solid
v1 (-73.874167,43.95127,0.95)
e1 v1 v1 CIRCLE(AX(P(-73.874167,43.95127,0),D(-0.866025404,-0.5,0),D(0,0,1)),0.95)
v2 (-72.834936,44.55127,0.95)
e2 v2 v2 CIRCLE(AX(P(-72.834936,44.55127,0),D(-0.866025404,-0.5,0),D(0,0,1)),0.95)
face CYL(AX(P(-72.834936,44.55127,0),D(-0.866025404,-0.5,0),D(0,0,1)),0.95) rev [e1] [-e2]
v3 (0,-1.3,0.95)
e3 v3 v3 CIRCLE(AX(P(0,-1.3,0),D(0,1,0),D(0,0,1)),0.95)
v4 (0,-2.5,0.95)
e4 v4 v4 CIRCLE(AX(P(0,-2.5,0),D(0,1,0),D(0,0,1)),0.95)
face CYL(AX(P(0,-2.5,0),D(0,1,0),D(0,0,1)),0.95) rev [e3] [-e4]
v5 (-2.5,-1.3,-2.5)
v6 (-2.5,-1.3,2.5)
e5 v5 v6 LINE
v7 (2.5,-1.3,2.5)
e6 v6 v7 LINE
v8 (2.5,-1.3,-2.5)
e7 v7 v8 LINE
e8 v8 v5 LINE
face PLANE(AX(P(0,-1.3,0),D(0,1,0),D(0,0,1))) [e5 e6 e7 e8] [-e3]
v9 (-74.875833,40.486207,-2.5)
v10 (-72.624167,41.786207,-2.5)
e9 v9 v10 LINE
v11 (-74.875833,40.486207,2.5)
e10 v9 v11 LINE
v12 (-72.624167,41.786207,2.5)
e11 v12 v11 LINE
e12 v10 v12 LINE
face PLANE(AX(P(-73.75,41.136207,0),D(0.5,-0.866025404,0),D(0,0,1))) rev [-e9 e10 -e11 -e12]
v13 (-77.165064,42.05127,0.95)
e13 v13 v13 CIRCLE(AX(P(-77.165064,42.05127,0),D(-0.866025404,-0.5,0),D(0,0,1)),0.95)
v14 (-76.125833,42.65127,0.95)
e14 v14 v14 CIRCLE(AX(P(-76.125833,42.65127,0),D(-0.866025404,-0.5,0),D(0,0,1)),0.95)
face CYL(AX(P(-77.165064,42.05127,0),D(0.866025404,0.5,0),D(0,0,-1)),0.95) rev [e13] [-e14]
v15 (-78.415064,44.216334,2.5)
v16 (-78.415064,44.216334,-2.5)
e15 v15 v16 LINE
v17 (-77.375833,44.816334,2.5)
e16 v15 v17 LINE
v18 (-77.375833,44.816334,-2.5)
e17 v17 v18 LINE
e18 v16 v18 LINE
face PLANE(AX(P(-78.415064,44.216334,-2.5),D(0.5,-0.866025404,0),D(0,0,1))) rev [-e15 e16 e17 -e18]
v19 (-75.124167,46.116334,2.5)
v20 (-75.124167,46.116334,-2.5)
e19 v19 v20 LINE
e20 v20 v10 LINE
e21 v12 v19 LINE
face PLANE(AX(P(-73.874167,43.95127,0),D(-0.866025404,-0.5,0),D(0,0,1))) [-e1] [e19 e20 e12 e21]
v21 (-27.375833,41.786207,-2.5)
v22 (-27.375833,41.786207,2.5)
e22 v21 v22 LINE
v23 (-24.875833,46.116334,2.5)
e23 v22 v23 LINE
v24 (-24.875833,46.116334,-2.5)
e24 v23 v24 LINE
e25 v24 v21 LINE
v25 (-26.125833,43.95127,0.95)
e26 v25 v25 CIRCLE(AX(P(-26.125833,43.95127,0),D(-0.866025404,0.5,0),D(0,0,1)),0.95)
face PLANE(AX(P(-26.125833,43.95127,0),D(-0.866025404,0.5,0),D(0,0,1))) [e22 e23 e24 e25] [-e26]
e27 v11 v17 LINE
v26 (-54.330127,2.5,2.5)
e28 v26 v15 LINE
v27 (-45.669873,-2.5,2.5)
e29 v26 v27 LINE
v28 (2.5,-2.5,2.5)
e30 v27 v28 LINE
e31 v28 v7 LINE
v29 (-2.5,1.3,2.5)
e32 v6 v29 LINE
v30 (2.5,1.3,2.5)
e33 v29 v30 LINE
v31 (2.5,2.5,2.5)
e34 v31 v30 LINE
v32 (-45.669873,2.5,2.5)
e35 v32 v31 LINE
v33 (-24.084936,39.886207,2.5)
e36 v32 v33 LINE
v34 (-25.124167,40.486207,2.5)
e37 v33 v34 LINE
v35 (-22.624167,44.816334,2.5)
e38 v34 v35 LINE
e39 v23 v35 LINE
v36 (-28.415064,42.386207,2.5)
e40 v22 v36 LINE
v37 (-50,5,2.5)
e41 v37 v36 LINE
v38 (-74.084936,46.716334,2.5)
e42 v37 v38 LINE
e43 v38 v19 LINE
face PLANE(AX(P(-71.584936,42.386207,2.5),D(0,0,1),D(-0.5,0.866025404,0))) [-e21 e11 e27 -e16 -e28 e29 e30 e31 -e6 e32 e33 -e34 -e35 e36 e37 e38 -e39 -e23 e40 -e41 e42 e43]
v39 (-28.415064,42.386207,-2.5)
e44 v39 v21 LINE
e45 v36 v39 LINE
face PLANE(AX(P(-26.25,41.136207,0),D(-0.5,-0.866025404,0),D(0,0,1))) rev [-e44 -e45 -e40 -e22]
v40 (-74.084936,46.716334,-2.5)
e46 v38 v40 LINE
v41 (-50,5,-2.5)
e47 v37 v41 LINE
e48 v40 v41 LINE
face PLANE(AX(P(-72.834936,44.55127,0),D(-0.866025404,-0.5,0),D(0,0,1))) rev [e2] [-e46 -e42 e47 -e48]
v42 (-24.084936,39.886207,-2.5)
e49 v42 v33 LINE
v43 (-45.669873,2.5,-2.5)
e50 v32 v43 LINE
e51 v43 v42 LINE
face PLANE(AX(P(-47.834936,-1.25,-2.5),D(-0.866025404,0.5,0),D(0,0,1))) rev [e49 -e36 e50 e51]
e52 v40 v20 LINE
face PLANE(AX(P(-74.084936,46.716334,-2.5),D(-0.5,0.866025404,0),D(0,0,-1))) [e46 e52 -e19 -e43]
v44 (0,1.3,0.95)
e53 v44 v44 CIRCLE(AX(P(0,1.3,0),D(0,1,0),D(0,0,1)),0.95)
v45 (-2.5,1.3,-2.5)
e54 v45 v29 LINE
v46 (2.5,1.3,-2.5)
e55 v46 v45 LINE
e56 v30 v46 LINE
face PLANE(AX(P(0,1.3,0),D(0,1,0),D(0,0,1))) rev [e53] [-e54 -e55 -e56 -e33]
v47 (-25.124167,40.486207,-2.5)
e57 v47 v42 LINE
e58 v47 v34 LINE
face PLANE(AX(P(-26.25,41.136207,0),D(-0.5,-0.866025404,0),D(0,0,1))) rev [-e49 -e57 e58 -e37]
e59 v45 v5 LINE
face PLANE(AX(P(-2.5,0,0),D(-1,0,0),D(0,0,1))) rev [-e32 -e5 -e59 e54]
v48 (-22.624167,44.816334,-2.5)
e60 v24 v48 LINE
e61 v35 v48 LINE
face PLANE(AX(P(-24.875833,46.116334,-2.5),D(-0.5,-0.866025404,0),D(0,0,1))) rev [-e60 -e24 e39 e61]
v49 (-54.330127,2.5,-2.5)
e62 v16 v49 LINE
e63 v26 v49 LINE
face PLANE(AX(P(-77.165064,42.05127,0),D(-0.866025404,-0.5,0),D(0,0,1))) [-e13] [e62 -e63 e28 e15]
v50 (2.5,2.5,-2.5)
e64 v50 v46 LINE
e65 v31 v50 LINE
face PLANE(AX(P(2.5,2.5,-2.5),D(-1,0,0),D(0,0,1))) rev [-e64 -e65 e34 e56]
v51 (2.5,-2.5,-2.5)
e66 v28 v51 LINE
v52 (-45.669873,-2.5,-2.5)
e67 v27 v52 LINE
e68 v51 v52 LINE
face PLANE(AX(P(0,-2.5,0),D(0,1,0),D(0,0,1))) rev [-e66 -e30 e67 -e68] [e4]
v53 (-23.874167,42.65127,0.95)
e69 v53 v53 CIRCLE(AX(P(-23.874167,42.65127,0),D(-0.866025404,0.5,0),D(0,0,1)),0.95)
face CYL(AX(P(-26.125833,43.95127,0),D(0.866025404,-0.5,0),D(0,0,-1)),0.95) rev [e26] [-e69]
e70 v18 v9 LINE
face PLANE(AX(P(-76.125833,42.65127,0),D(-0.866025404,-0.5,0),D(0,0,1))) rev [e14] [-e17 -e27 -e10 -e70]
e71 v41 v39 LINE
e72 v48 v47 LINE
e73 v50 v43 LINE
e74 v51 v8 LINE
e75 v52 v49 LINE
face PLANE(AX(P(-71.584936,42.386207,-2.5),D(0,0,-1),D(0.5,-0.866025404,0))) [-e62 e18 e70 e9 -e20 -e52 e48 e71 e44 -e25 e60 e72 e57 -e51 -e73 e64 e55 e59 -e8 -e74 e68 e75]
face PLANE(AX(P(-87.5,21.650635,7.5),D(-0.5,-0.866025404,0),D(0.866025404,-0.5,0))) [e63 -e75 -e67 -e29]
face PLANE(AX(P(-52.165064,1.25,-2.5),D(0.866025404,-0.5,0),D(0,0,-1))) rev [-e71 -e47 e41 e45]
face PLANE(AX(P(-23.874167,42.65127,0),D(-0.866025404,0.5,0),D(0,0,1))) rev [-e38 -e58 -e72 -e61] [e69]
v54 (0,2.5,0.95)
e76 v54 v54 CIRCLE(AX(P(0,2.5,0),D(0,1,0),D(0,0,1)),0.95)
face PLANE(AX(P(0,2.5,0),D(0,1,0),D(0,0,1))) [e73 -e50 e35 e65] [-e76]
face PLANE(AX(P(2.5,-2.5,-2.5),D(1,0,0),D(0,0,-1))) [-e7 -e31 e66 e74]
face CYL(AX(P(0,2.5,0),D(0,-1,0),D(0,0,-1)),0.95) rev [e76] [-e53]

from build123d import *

# Parameters (mm, degrees)
SKETCH1_W               = 5
SKETCH1_H               = 5
SKETCH1_R               = 0.95
CENTER_DEPTH            = 1.3
RIGHTSIDE_START         = 1.3
SKETCH1_2_W             = 5
SKETCH1_2_H             = 5
SKETCH1_2_R             = 0.95
RIGHTSIDE_DEPTH         = 1.2
LEFTSIDE_START          = -1.3
SKETCH1_3_W             = 5
SKETCH1_3_H             = 5
SKETCH1_3_R             = 0.95
LEFTSIDE_DEPTH          = 1.2
SKETCH3_W               = 5
SKETCH3_H               = 5
BOSS_EXTRUDE4_DEPTH     = 47.5
CUT_EXTRUDE1_DEPTH      = 5
CIRPATTERN2_COUNT       = 6
CIRPATTERN3_COUNT       = 3
CIRPATTERN4_START       = -1.3
CIRPATTERN4_OUTLINE_W   = 5
CIRPATTERN4_OUTLINE_H   = 5
CIRPATTERN4_OUTLINE_R   = 0.95
CIRPATTERN4_DEPTH       = 2.6
CIRPATTERN4_START_2     = -44.601270189
CIRPATTERN4_2_OUTLINE_W = 5
CIRPATTERN4_2_OUTLINE_H = 5
CIRPATTERN4_2_OUTLINE_R = 0.95
CIRPATTERN4_2_DEPTH     = 2.6
CIRPATTERN4_3_OUTLINE_W = 5
CIRPATTERN4_3_OUTLINE_H = 5
CIRPATTERN4_3_OUTLINE_R = 0.95
CIRPATTERN4_3_DEPTH     = 2.6
SKETCH5_W               = 5
SKETCH5_H               = 2.6
CUT_EXTRUDE2_DEPTH      = 5


# Read off the part's stored shape, not the designer's step: CirPattern4
with BuildPart() as part:
    # Sketch1 → Center (new, symmetric)
    with BuildSketch(Plane(origin=(0, 0, 0), x_dir=(1, 0, 0), z_dir=(0, 1, 0))):
        Rectangle(SKETCH1_W, SKETCH1_H)
        with Locations(Location((0, 0, 0), (0, 0, 270))):
            Circle(SKETCH1_R, mode=Mode.SUBTRACT)
    extrude(amount=CENTER_DEPTH, both=True)

    # Sketch5 → Cut-Extrude2 (cut)
    with BuildSketch(Plane(origin=(2.5, 0, 0), x_dir=(0, 0, -1), z_dir=(1, 0, 0))):
        Rectangle(SKETCH5_W, SKETCH5_H)
    extrude(amount=-CUT_EXTRUDE2_DEPTH, mode=Mode.SUBTRACT)


with BuildPart() as body_2:
    # Sketch1<2> → RightSide (new body)
    with BuildSketch(Plane(origin=(0, 0, 0), x_dir=(1, 0, 0), z_dir=(0, 1, 0)).offset(RIGHTSIDE_START)):
        Rectangle(SKETCH1_2_W, SKETCH1_2_H)
        with Locations(Location((0, 0, 0), (0, 0, 270))):
            Circle(SKETCH1_2_R, mode=Mode.SUBTRACT)
    extrude(amount=RIGHTSIDE_DEPTH)


with BuildPart() as body_3:
    # Sketch1<3> → LeftSide (new body)
    with BuildSketch(Plane(origin=(0, 0, 0), x_dir=(1, 0, 0), z_dir=(0, 1, 0)).offset(LEFTSIDE_START)):
        Rectangle(SKETCH1_3_W, SKETCH1_3_H)
        with Locations(Location((0, 0, 0), (0, 0, 270))):
            Circle(SKETCH1_3_R, mode=Mode.SUBTRACT)
    extrude(amount=-LEFTSIDE_DEPTH)


with BuildPart() as body_4:
    # Sketch3 → Boss-Extrude4 (new body)
    with BuildSketch(Plane.ZY.offset(2.5)):
        Rectangle(SKETCH3_W, SKETCH3_H)
    extrude(amount=BOSS_EXTRUDE4_DEPTH)

    # Sketch4 → Cut-Extrude1 (cut)
    with BuildSketch(Plane.XY.offset(-2.5)):
        Polygon((-50, 0), (-50, -2.5), (-45.669872981, -2.5), align=None)
        Polygon((-50, 2.5), (-50, 0), (-45.669872981, 2.5), align=None)
    extrude(amount=CUT_EXTRUDE1_DEPTH, mode=Mode.SUBTRACT)


with BuildPart() as cirpattern2_1:
    # CirPattern2: pattern copy
    add(body_4.part.rotate(Axis((-50, 0, 0), (0, 0, 1)), 1 * 360 / CIRPATTERN2_COUNT))


with BuildPart() as cirpattern2_2:
    # CirPattern2: pattern copy
    add(body_4.part.rotate(Axis((-50, 0, 0), (0, 0, 1)), 2 * 360 / CIRPATTERN2_COUNT))


with BuildPart() as cirpattern2_3:
    # CirPattern2: pattern copy
    add(body_4.part.rotate(Axis((-50, 0, 0), (0, 0, 1)), 3 * 360 / CIRPATTERN2_COUNT))


with BuildPart() as cirpattern2_4:
    # CirPattern2: pattern copy
    add(body_4.part.rotate(Axis((-50, 0, 0), (0, 0, 1)), 4 * 360 / CIRPATTERN2_COUNT))


with BuildPart() as cirpattern2_5:
    # CirPattern2: pattern copy
    add(body_4.part.rotate(Axis((-50, 0, 0), (0, 0, 1)), 5 * 360 / CIRPATTERN2_COUNT))


with BuildPart() as cirpattern3_1:
    # CirPattern3: pattern copy
    add(body_3.part.rotate(Axis((-50, 0, 0), (0, 0, 1)), 1 * 360 / CIRPATTERN3_COUNT))


with BuildPart() as cirpattern3_2:
    # CirPattern3: pattern copy
    add(body_3.part.rotate(Axis((-50, 0, 0), (0, 0, 1)), 2 * 360 / CIRPATTERN3_COUNT))


with BuildPart() as cirpattern3_3:
    # CirPattern3: pattern copy
    add(body_2.part.rotate(Axis((-50, 0, 0), (0, 0, 1)), 1 * 360 / CIRPATTERN3_COUNT))


with BuildPart() as cirpattern3_4:
    # CirPattern3: pattern copy
    add(body_2.part.rotate(Axis((-50, 0, 0), (0, 0, 1)), 2 * 360 / CIRPATTERN3_COUNT))


with BuildPart() as body_14:
    # CirPattern4 outline → CirPattern4 (new body)
    with BuildSketch(Plane(origin=(0, 0, 0), x_dir=(1, 0, 0), z_dir=(0, 1, 0)).offset(CIRPATTERN4_START)):
        with Locations((-100, 0)):
            Rectangle(CIRPATTERN4_OUTLINE_W, CIRPATTERN4_OUTLINE_H)
        with Locations((-100, 0)):
            Circle(CIRPATTERN4_OUTLINE_R, mode=Mode.SUBTRACT)
    extrude(amount=CIRPATTERN4_DEPTH)


with BuildPart() as body_15:
    # CirPattern4 2 outline → CirPattern4 2 (new body)
    with BuildSketch(Plane(origin=(0, 0, 0), x_dir=(0.5000000000000098, -0.8660254037844329, 0), z_dir=(0.8660254037844329, 0.50000000000001, 0)).offset(CIRPATTERN4_START_2)):
        with Locations((25, 0)):
            Rectangle(CIRPATTERN4_2_OUTLINE_W, CIRPATTERN4_2_OUTLINE_H)
        with Locations((25, 0)):
            Circle(CIRPATTERN4_2_OUTLINE_R, mode=Mode.SUBTRACT)
    extrude(amount=CIRPATTERN4_2_DEPTH)


with BuildPart() as body_16:
    # CirPattern4 3 outline → CirPattern4 3 (new body)
    with BuildSketch(Plane(origin=(0, 0, 0), x_dir=(0.49999999999999767, 0.86602540378444, 0), z_dir=(0.8660254037844399, -0.49999999999999795, 0)).offset(CIRPATTERN4_START_2)):
        with Locations((25, 0)):
            Rectangle(CIRPATTERN4_3_OUTLINE_W, CIRPATTERN4_3_OUTLINE_H)
        with Locations((25, 0)):
            Circle(CIRPATTERN4_3_OUTLINE_R, mode=Mode.SUBTRACT)
    extrude(amount=CIRPATTERN4_3_DEPTH)


with BuildPart() as cirpattern3_1_1:
    add(cirpattern3_1.part)

    # Combine1: union CirPattern3_3, CirPattern2_2, body 16, CirPattern2_1, body 3, body 2, body 4
    add(cirpattern3_3.part)
    add(cirpattern2_2.part)
    add(body_16.part)
    add(cirpattern2_1.part)
    add(body_3.part)
    add(body_2.part)
    add(body_4.part)

    # Combine3: cut CirPattern2_5, CirPattern3_2, body 15, CirPattern2_4, CirPattern3_4, CirPattern2_3, body 14
    add(cirpattern2_5.part, mode=Mode.SUBTRACT)
    add(cirpattern3_2.part, mode=Mode.SUBTRACT)
    add(body_15.part, mode=Mode.SUBTRACT)
    add(cirpattern2_4.part, mode=Mode.SUBTRACT)
    add(cirpattern3_4.part, mode=Mode.SUBTRACT)
    add(cirpattern2_3.part, mode=Mode.SUBTRACT)
    add(body_14.part, mode=Mode.SUBTRACT)


solid = cirpattern3_1_1.part
